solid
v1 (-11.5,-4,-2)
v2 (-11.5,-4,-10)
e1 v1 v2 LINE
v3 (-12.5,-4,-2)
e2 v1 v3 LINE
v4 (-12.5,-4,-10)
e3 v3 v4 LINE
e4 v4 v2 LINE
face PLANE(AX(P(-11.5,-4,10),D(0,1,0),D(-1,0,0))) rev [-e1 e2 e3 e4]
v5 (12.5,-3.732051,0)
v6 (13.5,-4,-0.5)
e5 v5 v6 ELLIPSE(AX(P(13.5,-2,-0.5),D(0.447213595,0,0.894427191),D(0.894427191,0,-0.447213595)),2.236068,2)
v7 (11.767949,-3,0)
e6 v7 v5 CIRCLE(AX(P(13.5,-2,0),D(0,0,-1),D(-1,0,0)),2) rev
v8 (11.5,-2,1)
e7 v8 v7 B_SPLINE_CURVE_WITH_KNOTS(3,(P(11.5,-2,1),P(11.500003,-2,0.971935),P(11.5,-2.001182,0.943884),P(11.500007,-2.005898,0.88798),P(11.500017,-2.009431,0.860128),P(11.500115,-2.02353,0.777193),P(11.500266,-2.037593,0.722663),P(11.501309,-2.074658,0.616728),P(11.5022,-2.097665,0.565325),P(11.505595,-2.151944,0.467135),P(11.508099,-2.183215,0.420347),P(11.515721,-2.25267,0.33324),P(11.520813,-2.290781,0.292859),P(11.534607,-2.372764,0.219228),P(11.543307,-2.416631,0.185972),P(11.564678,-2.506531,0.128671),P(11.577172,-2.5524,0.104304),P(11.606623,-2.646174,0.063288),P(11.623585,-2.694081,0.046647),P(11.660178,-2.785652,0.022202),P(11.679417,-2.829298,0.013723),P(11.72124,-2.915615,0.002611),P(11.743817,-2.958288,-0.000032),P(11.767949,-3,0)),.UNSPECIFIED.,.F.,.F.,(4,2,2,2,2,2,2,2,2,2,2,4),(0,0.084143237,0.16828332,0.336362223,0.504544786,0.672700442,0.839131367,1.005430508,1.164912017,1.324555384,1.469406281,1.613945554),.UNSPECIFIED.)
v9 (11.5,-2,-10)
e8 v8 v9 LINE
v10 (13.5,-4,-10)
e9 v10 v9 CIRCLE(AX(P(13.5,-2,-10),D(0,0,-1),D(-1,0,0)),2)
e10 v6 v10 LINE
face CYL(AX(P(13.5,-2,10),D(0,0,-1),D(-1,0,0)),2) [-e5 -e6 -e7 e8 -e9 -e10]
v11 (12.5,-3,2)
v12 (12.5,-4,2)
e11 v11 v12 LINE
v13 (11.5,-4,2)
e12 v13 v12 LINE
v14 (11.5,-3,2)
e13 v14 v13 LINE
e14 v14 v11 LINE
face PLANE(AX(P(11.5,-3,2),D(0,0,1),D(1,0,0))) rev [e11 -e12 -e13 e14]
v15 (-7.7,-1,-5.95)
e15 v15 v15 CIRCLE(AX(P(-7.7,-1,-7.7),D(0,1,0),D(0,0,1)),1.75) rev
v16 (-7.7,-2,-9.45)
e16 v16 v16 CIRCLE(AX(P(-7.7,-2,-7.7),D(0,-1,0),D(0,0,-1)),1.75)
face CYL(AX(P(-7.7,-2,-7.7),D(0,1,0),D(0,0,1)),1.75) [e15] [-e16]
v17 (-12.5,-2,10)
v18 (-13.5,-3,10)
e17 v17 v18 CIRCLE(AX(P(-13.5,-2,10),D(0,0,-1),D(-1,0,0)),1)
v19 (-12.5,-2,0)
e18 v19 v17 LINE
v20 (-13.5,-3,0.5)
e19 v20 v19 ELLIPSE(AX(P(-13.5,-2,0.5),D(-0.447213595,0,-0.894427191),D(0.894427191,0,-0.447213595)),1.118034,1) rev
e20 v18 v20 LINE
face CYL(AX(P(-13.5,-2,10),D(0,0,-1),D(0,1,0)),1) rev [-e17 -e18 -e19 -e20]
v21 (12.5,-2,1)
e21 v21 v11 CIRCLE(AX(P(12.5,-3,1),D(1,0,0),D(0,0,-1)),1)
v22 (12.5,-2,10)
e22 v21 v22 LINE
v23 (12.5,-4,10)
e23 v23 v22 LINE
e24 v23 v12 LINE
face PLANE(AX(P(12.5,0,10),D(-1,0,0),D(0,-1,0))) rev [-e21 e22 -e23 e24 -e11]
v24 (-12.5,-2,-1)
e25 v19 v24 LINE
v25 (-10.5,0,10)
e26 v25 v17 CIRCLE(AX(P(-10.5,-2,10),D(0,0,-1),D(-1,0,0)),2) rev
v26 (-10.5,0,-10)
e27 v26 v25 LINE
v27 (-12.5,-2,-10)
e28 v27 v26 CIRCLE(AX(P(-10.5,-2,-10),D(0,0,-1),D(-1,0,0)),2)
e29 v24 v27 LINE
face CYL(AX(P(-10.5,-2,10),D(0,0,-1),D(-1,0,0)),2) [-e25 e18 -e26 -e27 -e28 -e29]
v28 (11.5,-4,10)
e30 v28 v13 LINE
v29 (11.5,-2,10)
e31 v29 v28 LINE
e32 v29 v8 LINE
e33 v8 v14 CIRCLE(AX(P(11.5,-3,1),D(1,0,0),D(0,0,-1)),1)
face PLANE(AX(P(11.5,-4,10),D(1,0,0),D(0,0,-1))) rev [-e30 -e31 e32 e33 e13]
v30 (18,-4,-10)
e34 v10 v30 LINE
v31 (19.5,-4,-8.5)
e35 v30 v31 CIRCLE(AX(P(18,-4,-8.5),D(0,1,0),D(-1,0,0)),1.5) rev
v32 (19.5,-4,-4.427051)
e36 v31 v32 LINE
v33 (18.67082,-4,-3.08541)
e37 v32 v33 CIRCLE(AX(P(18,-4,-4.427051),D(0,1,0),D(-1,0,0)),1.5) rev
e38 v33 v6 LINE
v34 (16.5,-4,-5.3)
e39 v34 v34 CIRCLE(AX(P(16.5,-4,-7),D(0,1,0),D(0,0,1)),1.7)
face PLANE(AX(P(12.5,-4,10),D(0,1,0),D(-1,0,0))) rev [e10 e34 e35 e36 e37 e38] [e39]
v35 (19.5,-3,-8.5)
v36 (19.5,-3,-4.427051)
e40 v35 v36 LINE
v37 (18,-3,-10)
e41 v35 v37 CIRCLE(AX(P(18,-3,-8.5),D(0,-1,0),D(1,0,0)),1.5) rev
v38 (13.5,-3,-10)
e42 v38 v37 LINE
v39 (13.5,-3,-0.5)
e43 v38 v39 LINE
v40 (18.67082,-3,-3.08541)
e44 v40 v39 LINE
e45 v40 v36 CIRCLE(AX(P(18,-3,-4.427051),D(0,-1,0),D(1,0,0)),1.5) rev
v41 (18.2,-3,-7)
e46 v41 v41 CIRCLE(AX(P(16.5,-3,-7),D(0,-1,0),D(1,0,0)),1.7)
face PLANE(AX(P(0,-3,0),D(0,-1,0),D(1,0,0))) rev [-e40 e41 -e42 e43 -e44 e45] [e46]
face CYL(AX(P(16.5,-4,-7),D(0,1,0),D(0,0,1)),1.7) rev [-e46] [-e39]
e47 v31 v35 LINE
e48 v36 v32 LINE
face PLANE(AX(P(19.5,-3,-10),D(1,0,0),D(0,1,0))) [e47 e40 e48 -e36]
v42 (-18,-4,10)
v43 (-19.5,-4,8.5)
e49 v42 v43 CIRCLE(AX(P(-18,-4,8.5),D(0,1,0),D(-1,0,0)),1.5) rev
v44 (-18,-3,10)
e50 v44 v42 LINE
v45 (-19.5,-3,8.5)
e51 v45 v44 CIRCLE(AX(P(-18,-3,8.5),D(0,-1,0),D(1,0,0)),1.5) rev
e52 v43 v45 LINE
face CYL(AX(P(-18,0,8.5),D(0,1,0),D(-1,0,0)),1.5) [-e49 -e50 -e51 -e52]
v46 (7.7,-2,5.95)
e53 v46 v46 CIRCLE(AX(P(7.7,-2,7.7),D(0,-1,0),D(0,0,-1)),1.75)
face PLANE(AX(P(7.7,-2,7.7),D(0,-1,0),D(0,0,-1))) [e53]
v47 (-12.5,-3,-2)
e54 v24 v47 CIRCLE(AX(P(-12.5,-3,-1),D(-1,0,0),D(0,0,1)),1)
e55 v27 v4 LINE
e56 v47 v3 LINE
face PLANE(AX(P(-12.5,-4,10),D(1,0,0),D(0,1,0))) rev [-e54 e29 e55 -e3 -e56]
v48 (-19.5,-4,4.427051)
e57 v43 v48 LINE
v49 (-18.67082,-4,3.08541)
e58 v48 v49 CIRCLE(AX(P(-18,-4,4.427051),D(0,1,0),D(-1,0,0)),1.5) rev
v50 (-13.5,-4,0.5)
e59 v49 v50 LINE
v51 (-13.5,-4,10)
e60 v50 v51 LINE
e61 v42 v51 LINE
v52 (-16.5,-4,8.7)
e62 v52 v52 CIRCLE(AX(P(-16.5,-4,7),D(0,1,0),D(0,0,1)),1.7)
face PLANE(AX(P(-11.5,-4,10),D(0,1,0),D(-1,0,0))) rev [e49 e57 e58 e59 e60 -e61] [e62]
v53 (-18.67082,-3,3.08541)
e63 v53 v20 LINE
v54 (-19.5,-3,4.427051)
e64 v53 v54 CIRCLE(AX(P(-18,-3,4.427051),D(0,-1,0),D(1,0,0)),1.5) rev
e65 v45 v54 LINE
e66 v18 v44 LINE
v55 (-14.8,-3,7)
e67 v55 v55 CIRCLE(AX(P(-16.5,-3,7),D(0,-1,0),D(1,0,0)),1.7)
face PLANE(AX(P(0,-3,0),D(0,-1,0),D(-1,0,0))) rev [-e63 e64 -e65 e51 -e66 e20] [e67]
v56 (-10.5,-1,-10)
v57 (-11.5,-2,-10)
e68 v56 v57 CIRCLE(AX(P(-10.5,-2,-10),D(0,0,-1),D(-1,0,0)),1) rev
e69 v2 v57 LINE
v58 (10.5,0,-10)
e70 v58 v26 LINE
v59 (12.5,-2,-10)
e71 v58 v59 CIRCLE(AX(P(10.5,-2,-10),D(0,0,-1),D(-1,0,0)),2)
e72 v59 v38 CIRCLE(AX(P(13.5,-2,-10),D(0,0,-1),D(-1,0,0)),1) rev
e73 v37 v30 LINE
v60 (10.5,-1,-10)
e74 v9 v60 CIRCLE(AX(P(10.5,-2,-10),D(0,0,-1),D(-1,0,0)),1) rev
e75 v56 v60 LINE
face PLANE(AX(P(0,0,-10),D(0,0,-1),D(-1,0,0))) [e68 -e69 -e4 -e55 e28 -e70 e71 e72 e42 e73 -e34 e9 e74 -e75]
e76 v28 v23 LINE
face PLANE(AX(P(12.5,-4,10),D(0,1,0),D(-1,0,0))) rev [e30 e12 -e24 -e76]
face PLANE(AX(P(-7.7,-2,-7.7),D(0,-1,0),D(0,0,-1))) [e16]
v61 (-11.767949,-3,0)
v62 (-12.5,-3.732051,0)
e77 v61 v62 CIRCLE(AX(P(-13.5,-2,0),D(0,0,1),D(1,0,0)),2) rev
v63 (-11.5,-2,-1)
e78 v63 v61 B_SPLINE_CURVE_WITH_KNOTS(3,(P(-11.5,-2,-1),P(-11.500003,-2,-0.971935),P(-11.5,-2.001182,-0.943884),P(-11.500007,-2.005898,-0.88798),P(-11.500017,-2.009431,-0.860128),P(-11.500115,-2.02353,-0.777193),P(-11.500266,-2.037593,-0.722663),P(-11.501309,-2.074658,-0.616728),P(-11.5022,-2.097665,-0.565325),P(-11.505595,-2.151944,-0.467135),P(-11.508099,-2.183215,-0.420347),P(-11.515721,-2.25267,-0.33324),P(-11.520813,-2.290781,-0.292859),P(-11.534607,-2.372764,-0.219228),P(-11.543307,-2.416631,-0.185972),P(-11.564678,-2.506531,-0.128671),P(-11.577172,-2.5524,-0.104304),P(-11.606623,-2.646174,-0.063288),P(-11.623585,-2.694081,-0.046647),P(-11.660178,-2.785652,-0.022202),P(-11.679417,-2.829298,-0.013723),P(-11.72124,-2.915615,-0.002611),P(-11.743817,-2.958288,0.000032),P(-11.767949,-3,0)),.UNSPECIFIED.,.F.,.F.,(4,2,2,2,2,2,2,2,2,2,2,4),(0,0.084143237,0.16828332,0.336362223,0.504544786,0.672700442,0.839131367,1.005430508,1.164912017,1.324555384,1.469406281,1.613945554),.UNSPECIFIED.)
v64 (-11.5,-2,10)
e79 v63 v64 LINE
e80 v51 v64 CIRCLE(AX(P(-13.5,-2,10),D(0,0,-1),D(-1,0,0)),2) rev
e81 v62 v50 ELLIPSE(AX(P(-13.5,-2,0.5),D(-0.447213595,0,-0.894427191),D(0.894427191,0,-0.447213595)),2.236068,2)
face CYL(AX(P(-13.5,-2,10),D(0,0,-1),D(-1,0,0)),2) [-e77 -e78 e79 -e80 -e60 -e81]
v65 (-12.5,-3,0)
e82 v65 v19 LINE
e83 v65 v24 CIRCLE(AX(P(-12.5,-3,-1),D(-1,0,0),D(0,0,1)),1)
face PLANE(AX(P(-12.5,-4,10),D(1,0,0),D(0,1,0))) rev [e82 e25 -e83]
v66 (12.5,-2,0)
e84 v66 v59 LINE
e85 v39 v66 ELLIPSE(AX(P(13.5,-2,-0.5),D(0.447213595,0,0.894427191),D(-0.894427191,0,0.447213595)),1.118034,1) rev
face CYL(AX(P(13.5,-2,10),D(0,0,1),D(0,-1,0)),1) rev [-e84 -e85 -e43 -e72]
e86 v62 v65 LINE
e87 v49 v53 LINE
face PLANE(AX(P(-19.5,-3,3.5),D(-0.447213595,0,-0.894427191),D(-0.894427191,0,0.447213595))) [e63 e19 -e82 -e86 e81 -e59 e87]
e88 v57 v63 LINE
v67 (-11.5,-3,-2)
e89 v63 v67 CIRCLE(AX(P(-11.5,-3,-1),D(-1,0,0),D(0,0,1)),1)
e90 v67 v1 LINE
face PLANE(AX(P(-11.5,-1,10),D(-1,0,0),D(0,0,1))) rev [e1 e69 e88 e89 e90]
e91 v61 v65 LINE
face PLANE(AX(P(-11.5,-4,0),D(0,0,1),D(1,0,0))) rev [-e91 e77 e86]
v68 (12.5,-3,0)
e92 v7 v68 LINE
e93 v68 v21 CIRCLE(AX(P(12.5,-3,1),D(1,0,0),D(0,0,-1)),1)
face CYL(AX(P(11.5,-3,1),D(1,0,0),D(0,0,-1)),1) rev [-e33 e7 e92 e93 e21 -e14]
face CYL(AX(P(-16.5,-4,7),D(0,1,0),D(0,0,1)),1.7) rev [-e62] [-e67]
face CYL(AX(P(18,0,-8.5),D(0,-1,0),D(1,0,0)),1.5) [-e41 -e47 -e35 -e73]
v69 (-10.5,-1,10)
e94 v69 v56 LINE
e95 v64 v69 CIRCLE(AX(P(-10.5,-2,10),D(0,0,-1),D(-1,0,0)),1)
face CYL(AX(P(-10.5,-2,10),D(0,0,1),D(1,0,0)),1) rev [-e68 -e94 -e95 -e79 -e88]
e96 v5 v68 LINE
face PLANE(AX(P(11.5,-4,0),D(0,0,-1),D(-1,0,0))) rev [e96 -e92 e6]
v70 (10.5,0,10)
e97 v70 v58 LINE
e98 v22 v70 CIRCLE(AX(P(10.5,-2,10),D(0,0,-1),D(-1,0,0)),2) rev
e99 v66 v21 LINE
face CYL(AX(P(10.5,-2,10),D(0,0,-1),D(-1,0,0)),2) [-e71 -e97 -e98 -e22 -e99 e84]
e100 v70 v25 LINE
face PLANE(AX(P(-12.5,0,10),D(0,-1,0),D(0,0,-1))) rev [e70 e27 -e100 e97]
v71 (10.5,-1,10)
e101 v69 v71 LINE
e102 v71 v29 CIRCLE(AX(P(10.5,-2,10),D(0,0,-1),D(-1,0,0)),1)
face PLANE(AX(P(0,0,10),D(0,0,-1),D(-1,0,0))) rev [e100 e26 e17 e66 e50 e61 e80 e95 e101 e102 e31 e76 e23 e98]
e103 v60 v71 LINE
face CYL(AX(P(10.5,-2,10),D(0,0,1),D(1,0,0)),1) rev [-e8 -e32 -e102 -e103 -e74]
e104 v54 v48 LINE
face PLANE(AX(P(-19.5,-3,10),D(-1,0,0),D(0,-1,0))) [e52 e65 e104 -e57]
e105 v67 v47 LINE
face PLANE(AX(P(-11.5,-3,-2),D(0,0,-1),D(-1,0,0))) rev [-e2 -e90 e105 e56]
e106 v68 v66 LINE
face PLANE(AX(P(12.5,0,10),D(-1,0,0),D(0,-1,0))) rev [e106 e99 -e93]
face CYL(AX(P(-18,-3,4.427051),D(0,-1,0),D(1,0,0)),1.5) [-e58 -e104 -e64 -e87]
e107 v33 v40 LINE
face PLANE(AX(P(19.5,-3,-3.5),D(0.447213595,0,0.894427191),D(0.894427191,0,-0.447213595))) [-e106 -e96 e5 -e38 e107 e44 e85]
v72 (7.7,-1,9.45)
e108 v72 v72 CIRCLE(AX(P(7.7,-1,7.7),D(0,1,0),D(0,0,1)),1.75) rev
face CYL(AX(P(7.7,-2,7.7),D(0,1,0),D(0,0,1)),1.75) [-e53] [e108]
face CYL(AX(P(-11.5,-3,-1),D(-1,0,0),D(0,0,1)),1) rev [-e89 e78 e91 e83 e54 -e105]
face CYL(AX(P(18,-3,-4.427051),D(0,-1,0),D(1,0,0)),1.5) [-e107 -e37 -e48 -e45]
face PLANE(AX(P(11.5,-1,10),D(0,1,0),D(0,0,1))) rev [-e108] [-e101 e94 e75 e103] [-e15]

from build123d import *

# Parameters (mm, degrees)
BOSS_EXTRUDE1_DEPTH = 10
CUT_EXTRUDE1_DEPTH  = 1
CIRPATTERN1_COUNT   = 2
CIRPATTERN1_ANGLE   = 180
BOSS_EXTRUDE2_DEPTH = 1
CIRPATTERN2_COUNT   = 2
CIRPATTERN2_ANGLE   = 180
FILLET1_R           = 1.5
FILLET2_R           = 1
FILLET3_R           = 2
SKETCH5_R           = 1.7
CUT_EXTRUDE2_DEPTH  = 23.276669473
SKETCH6_R           = 1.75
BOSS_EXTRUDE3_DEPTH = 1


# Some blends are built 0.0001 mm under size
with BuildPart() as part:
    # Sketch1 → Boss-Extrude1 (new, symmetric)
    with BuildSketch(Plane.XY):
        Polygon((-12.5, -4), (-12.5, 0), (12.5, 0), (12.5, -4), (11.5, -4), (11.5, -1), (-11.5, -1), (-11.5, -4), align=None)
    extrude(amount=BOSS_EXTRUDE1_DEPTH, both=True)

    # Sketch3 → Cut-Extrude1 (cut)
    with BuildSketch(Plane(origin=(12.5, 0, 0), x_dir=(0, 0, -1), z_dir=(1, 0, 0))):
        with BuildLine():
            Line((-2, -3), (-2, -4))
            Line((-2, -4), (0, -4))
            Line((0, -4), (0, -3))
            ThreePointArc((0, -3), (-1, -2), (-2, -3))
        make_face()
    cut_extrude1 = extrude(amount=-CUT_EXTRUDE1_DEPTH, mode=Mode.SUBTRACT)

    # CirPattern1: Cut-Extrude1 ×2 about axis
    cirpattern1_axis = Axis((0, -50, 0), (0, 1, 0))
    for i in range(1, CIRPATTERN1_COUNT):
        add(cut_extrude1.rotate(cirpattern1_axis, i * CIRPATTERN1_ANGLE / (CIRPATTERN1_COUNT - 1)), mode=Mode.SUBTRACT)

    # Sketch4 → Boss-Extrude2 (add)
    with BuildSketch(Plane.XZ.offset(4)):
        Polygon((12.5, -10), (19.5, -10), (19.5, -3.5), (12.5, 0), align=None)
    boss_extrude2 = extrude(amount=-BOSS_EXTRUDE2_DEPTH)

    # CirPattern2: Boss-Extrude2 ×2 about axis
    cirpattern2_axis = Axis((0, 0, 0), (0, 1, 0))
    for i in range(1, CIRPATTERN2_COUNT):
        add(boss_extrude2.rotate(cirpattern2_axis, i * CIRPATTERN2_ANGLE / (CIRPATTERN2_COUNT - 1)))

    # Fillet1
    fillet1_edges = [part.edges().sort_by_distance(p)[0] for p in [
        (19.5, -3.5, -3.5),
        (19.5, -3.5, -10),
        (-19.5, -3.5, 3.5),
        (-19.5, -3.5, 10),
    ]]
    fillet(fillet1_edges, radius=FILLET1_R)

    # Fillet2
    # the kernel refuses this fillet: 1 mm, written as the material it adds along each edge
    with BuildSketch(Plane(origin=(11.5, -1, 10), x_dir=(0, -1, 0), z_dir=(0, 0, -1))) as fillet2_piece_1:
        with BuildLine():
            CenterArc((FILLET2_R, FILLET2_R), FILLET2_R, 180, 90)
            Line((0, FILLET2_R), (0, 0))
            Line((0, 0), (FILLET2_R, 0))
        make_face()
    extrude(amount=20)
    with BuildSketch(Plane(origin=(-11.5, -1, -10), x_dir=(1, 0, 0), z_dir=(0, 0, 1))) as fillet2_piece_2:
        with BuildLine():
            CenterArc((FILLET2_R, -FILLET2_R), FILLET2_R, 90, 90)
            Line((0, -FILLET2_R), (0, 0))
            Line((0, 0), (FILLET2_R, 0))
        make_face()
    extrude(amount=20)
    with BuildSketch(Plane(origin=(-12.5, -3, -2.5), x_dir=(0, 1, 0), z_dir=(0, 0, 1))) as fillet2_piece_3_section:
        with BuildLine():
            CenterArc((FILLET2_R, FILLET2_R), FILLET2_R, 180, 90)
            Line((0, FILLET2_R), (0, 0))
            Line((0, 0), (FILLET2_R, 0))
        make_face()
    fillet2_piece_3 = extrude(amount=12.5, mode=Mode.PRIVATE)
    fillet2_piece_3 = split(fillet2_piece_3, bisect_by=Plane(origin=(-14.699431135, -2.775586215, 1.099715568), z_dir=(0.44721359549996453, 0, 0.8944271909999126)), keep=Keep.TOP, mode=Mode.PRIVATE)
    add(fillet2_piece_3)
    with BuildSketch(Plane(origin=(12.5, -3, 2.5), x_dir=(1, 0, 0), z_dir=(0, 0, -1))) as fillet2_piece_4_section:
        with BuildLine():
            CenterArc((FILLET2_R, -FILLET2_R), FILLET2_R, 90, 90)
            Line((0, -FILLET2_R), (0, 0))
            Line((0, 0), (FILLET2_R, 0))
        make_face()
    fillet2_piece_4 = extrude(amount=12.5, mode=Mode.PRIVATE)
    fillet2_piece_4 = split(fillet2_piece_4, bisect_by=Plane(origin=(14.699431135, -2.775586215, -1.099715568), z_dir=(-0.44721359549995826, 0, -0.8944271909999157)), keep=Keep.TOP, mode=Mode.PRIVATE)
    add(fillet2_piece_4)

    # Fillet3
    fillet3_edges = [part.edges().sort_by_distance(p)[0] for p in [
        (-12.5, 0, 0),
        (12.5, 0, 0),
        (11.5, -4, -5),
        (-11.5, -4, 5),
    ]]
    fillet(fillet3_edges, radius=FILLET3_R - 0.0001)  # a hair under: the kernel refuses the full size

    # Sketch5 → Cut-Extrude2 (cut, through all)
    with BuildSketch(Plane(origin=(0, 0, 0), x_dir=(1, 0, 0), z_dir=(0, 1, 0))):
        with Locations(Location((16.5, 7, 0), (0, 0, 270))):
            Circle(SKETCH5_R)
        with Locations(Location((-16.5, -7, 0), (0, 0, 270))):
            Circle(SKETCH5_R)
    extrude(amount=-CUT_EXTRUDE2_DEPTH, mode=Mode.SUBTRACT)

    # Sketch6 → Boss-Extrude3 (add)
    with BuildSketch(Plane.XZ.offset(1)):
        with Locations(Location((7.7, 7.7, 0), (0, 0, 90))):
            Circle(SKETCH6_R)
        with Locations(Location((-7.7, -7.7, 0), (0, 0, 90))):
            Circle(SKETCH6_R)
    extrude(amount=BOSS_EXTRUDE3_DEPTH)


solid = part.part
